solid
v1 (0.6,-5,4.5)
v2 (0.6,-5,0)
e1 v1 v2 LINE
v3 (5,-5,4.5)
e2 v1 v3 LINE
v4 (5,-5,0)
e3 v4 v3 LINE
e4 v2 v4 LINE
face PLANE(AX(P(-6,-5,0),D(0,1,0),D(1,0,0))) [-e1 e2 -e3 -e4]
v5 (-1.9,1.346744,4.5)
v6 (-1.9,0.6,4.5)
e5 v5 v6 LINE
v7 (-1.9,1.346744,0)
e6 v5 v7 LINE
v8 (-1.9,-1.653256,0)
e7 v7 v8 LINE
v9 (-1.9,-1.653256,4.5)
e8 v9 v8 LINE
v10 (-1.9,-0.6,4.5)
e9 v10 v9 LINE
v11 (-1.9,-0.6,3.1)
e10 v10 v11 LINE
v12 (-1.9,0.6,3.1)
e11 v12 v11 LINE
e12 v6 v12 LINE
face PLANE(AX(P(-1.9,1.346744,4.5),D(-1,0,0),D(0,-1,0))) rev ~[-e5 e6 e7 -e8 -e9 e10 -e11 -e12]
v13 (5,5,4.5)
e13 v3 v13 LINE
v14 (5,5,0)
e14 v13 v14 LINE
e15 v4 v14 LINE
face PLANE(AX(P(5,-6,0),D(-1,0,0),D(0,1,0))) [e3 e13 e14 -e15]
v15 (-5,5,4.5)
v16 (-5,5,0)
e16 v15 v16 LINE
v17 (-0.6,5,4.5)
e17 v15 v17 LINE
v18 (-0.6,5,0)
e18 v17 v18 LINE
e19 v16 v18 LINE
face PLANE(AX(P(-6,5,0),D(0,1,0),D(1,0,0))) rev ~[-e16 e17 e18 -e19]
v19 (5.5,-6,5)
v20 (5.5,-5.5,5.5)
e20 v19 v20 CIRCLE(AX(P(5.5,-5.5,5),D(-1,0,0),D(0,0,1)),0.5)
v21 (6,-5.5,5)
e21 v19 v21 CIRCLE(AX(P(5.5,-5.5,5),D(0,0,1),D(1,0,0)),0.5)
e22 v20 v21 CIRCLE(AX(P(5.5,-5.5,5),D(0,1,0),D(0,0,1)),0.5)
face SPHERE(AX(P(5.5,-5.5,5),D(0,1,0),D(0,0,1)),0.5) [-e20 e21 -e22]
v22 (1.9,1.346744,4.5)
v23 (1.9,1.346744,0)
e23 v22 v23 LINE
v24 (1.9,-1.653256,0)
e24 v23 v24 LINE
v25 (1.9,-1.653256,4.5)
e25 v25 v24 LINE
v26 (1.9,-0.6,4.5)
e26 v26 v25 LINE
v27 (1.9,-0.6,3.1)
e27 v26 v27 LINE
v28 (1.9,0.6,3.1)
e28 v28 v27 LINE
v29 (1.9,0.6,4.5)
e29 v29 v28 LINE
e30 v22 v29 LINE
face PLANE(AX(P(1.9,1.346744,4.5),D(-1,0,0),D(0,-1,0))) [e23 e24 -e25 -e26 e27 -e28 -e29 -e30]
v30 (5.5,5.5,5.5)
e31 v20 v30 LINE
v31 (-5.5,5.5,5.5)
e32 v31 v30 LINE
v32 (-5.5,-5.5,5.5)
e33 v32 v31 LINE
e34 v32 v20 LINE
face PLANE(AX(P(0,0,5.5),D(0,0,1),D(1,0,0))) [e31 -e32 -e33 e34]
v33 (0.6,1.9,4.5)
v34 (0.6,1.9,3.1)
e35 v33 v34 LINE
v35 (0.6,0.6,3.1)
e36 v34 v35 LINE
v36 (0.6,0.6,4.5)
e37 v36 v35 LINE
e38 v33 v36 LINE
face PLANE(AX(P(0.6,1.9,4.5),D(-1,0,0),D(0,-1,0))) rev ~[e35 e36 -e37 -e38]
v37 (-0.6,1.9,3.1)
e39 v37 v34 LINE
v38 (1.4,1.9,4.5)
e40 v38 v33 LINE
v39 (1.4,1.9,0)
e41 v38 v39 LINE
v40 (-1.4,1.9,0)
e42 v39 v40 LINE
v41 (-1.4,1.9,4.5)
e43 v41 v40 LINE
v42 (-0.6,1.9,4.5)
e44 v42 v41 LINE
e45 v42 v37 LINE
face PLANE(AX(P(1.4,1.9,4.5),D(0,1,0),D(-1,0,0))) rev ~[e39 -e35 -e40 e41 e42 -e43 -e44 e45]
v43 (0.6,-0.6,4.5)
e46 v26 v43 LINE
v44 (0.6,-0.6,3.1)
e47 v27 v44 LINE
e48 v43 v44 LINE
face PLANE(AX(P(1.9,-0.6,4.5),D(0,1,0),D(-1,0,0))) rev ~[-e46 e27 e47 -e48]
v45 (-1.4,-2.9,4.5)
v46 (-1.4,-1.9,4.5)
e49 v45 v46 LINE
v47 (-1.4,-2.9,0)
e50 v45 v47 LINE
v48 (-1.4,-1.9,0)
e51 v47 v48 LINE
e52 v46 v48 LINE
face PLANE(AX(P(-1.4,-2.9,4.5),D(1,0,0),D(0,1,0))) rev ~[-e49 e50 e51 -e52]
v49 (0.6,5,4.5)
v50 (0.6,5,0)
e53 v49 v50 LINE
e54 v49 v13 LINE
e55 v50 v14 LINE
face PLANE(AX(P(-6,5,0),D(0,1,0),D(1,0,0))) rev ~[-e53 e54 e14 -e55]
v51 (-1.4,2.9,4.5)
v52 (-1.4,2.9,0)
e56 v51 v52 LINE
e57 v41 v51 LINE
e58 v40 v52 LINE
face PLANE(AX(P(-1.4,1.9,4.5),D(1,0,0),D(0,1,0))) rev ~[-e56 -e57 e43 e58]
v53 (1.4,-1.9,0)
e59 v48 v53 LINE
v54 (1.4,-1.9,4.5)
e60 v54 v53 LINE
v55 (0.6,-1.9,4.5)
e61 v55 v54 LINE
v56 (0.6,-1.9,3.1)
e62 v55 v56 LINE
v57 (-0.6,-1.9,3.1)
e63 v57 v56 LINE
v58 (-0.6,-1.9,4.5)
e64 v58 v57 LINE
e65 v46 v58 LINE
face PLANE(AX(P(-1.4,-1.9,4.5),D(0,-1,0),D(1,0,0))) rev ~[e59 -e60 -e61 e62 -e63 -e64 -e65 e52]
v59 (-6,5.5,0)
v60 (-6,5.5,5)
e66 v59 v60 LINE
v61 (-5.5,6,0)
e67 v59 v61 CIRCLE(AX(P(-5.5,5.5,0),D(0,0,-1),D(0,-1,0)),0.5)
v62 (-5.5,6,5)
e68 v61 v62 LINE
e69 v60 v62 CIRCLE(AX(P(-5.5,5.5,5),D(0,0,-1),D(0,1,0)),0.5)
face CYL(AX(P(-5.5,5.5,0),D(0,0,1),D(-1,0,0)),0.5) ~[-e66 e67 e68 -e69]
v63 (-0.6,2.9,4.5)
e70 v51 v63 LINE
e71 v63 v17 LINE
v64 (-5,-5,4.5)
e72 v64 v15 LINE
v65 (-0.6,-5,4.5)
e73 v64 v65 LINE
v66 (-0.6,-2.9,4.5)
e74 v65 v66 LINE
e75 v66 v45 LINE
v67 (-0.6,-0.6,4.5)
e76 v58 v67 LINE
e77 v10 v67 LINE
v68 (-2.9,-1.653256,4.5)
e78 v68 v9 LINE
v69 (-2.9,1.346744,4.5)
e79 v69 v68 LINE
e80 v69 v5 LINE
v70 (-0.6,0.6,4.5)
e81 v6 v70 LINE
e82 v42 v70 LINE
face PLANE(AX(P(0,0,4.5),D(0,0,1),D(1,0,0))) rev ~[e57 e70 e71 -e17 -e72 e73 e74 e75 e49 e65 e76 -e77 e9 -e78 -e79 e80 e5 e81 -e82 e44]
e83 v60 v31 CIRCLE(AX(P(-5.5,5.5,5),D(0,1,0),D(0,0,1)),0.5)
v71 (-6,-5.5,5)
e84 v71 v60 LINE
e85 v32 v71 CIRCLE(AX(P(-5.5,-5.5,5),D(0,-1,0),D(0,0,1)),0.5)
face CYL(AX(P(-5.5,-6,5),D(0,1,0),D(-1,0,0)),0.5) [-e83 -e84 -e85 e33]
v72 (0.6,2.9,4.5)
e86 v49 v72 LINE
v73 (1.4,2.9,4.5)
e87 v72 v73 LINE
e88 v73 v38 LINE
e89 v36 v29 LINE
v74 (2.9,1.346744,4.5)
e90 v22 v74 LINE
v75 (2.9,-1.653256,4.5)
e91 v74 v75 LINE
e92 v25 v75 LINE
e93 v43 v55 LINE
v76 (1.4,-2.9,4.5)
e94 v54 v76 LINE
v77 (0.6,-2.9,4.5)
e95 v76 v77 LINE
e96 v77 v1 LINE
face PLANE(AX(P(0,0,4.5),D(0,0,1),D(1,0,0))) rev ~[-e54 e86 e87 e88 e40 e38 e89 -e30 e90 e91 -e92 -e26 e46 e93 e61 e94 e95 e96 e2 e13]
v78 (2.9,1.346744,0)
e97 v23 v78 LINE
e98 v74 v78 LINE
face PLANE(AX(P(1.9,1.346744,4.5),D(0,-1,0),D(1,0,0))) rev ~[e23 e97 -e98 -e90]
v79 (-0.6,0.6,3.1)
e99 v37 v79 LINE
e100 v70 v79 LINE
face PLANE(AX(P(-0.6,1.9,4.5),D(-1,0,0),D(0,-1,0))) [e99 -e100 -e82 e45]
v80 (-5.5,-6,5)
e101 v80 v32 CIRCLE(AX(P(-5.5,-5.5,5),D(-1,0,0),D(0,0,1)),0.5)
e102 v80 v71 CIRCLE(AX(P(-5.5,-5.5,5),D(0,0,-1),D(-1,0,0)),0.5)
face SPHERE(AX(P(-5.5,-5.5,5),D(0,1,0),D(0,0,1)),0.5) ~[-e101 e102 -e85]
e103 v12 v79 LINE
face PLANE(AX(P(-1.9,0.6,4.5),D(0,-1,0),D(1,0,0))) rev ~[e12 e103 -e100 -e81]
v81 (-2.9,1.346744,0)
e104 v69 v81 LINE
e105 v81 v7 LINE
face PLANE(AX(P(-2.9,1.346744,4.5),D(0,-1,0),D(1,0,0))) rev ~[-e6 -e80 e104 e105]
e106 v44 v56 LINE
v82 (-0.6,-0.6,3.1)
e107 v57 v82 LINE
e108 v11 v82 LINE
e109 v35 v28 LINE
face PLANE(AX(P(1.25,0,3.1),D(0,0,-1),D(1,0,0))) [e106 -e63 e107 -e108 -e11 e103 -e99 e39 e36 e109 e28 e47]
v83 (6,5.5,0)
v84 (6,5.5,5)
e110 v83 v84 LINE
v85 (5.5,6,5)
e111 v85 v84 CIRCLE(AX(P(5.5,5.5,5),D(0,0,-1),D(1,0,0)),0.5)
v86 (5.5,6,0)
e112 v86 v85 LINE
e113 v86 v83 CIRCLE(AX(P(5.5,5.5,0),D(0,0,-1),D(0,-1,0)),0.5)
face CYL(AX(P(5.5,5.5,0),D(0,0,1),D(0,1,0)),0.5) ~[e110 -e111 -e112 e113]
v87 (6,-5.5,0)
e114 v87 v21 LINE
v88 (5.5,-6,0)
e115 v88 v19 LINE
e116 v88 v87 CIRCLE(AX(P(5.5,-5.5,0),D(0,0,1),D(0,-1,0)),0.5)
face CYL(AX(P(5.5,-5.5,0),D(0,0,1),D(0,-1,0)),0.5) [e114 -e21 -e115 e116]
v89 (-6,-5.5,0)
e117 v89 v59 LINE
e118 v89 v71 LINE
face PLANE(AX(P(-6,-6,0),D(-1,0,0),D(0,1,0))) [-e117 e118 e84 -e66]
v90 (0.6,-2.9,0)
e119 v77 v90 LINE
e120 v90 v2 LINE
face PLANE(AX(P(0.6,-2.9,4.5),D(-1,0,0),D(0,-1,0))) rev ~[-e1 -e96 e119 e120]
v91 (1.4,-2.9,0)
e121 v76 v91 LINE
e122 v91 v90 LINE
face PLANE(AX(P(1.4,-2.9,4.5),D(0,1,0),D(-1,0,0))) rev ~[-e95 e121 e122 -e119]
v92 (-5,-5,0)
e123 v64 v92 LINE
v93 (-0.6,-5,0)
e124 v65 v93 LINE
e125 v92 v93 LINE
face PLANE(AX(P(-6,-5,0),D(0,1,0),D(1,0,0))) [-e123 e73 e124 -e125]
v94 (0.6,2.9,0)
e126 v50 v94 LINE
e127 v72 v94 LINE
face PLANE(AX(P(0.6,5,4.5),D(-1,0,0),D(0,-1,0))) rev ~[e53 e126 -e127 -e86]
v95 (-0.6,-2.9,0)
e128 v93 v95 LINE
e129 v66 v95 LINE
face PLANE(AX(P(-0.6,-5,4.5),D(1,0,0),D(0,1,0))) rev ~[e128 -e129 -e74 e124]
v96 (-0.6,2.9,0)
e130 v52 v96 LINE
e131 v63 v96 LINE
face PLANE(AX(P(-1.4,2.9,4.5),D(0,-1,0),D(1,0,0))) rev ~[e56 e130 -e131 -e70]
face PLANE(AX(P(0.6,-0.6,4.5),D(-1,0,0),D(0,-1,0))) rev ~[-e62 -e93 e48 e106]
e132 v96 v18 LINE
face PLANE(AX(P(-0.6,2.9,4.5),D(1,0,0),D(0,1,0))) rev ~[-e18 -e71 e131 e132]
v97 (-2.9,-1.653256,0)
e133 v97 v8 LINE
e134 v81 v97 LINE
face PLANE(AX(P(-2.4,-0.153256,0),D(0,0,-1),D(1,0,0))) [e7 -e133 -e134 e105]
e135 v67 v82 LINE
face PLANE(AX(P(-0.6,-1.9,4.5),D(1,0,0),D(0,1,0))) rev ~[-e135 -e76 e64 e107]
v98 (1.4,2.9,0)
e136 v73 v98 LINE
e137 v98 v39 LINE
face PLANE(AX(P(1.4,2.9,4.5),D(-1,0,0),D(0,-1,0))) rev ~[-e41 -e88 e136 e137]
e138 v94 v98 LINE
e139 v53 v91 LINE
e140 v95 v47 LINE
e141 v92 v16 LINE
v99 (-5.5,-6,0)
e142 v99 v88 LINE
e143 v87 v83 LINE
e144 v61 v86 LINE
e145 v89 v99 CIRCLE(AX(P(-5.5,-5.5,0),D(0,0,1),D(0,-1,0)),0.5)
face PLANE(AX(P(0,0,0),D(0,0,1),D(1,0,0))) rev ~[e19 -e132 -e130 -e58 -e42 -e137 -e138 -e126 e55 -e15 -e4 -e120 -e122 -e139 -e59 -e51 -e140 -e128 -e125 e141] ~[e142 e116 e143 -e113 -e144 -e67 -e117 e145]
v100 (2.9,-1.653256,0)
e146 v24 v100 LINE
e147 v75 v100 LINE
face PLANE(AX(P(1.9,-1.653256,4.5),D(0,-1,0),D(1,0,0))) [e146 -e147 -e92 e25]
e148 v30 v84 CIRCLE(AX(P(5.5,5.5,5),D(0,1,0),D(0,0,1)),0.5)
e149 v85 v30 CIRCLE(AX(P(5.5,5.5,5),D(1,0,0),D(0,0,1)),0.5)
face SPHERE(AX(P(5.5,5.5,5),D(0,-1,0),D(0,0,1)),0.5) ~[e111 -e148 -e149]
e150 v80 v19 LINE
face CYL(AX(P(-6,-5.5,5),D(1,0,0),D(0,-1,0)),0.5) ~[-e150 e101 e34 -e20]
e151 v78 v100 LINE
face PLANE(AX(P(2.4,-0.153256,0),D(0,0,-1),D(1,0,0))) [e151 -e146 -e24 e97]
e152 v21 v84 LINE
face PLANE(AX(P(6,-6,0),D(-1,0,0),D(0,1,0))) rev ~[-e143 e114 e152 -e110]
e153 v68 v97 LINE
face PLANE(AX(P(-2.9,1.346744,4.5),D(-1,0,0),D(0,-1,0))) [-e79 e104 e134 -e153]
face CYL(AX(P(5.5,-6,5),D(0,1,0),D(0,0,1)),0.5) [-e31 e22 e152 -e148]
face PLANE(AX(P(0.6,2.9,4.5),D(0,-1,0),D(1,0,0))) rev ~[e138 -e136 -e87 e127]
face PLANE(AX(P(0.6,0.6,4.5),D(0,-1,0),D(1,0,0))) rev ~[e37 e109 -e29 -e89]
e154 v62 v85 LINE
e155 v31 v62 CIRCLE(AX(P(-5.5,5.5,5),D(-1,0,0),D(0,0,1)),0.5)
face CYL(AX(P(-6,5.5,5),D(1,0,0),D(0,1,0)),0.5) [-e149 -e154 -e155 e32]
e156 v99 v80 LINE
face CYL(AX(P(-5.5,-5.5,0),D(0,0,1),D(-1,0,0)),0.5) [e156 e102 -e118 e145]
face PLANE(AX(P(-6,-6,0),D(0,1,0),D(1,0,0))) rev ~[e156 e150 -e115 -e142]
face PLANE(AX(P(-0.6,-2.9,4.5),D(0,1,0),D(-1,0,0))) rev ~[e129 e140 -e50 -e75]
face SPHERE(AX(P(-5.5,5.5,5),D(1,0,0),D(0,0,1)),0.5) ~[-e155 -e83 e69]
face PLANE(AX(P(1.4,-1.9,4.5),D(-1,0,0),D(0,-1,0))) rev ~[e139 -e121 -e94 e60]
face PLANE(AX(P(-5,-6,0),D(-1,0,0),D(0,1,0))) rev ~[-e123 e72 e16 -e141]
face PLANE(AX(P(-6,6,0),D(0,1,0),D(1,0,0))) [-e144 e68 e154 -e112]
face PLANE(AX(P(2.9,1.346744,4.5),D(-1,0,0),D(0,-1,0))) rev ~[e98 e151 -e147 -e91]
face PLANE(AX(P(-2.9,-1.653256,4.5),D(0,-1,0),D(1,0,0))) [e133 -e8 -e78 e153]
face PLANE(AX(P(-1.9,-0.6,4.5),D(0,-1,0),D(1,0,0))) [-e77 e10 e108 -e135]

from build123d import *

# Parameters (mm, degrees)
F0_W     = 12
F0_H     = 12
F1_DEPTH = 5.5
F2_T     = -1
F3_W     = 1
F3_H     = 3
F4_DEPTH = 4.5
F6_W     = 1.3
F6_H     = 1.2
F6_W_2   = 1.2
F6_H_2   = 1.3
F7_DEPTH = 1.4
F8_R     = 0.5


with BuildPart() as f1:
    # F0 (on Top) → F1 (new body)
    with BuildSketch(Plane.XY):
        Rectangle(F0_W, F0_H)
    extrude(amount=F1_DEPTH)

    # F2
    f2_openings = [f1.faces().sort_by_distance(p)[0] for p in [
        (0, 0, 0),
    ]]
    offset(amount=F2_T, openings=f2_openings)

    # F3 (on face) → F4 (join, through all)
    with BuildSketch(Plane(origin=(0, 0, 4.5), x_dir=(1, 0, 0), z_dir=(0, 0, -1))):
        with Locations((2.4, 0.1532564508)):
            Rectangle(F3_W, F3_H)
        Polygon((0.6, 2.9), (0.6, 5), (0, 5), (-0.6, 5), (-0.6, 2.9), (-1.4, 2.9), (-1.4, 1.9), (0, 1.9), (1.4, 1.9), (1.4, 2.9), align=None)
        with Locations((-2.4, 0.1532564508)):
            Rectangle(F3_W, F3_H)
        Polygon((0, -1.9), (-1.4, -1.9), (-1.4, -2.9), (-0.6, -2.9), (-0.6, -5), (0, -5), (0.6, -5), (0.6, -2.9), (1.4, -2.9), (1.4, -1.9), align=None)
    extrude(amount=F4_DEPTH)

    # F6 (on face) → F7 (join, through all)
    with BuildSketch(Plane(origin=(0, 0, 4.5), x_dir=(1, 0, 0), z_dir=(0, 0, -1))):
        with Locations((1.25, 0)):
            Rectangle(F6_W, F6_H)
        Rectangle(F6_W_2, F6_H)
        with Locations((0, 1.25)):
            Rectangle(F6_W_2, F6_H_2)
        with Locations((-1.25, 0)):
            Rectangle(F6_W, F6_H)
        with Locations((0, -1.25)):
            Rectangle(F6_W_2, F6_H_2)
    extrude(amount=F7_DEPTH)

    # F8
    f8_edges = [f1.edges().sort_by_distance(p)[0] for p in [
        (6, 0, 5.5),
        (0, 6, 5.5),
        (-6, 0, 5.5),
        (0, -6, 5.5),
        (-6, 6, 2.75),
        (-6, -6, 2.75),
        (6, -6, 2.75),
        (6, 6, 2.75),
    ]]
    fillet(f8_edges, radius=F8_R)


solid = f1.part
